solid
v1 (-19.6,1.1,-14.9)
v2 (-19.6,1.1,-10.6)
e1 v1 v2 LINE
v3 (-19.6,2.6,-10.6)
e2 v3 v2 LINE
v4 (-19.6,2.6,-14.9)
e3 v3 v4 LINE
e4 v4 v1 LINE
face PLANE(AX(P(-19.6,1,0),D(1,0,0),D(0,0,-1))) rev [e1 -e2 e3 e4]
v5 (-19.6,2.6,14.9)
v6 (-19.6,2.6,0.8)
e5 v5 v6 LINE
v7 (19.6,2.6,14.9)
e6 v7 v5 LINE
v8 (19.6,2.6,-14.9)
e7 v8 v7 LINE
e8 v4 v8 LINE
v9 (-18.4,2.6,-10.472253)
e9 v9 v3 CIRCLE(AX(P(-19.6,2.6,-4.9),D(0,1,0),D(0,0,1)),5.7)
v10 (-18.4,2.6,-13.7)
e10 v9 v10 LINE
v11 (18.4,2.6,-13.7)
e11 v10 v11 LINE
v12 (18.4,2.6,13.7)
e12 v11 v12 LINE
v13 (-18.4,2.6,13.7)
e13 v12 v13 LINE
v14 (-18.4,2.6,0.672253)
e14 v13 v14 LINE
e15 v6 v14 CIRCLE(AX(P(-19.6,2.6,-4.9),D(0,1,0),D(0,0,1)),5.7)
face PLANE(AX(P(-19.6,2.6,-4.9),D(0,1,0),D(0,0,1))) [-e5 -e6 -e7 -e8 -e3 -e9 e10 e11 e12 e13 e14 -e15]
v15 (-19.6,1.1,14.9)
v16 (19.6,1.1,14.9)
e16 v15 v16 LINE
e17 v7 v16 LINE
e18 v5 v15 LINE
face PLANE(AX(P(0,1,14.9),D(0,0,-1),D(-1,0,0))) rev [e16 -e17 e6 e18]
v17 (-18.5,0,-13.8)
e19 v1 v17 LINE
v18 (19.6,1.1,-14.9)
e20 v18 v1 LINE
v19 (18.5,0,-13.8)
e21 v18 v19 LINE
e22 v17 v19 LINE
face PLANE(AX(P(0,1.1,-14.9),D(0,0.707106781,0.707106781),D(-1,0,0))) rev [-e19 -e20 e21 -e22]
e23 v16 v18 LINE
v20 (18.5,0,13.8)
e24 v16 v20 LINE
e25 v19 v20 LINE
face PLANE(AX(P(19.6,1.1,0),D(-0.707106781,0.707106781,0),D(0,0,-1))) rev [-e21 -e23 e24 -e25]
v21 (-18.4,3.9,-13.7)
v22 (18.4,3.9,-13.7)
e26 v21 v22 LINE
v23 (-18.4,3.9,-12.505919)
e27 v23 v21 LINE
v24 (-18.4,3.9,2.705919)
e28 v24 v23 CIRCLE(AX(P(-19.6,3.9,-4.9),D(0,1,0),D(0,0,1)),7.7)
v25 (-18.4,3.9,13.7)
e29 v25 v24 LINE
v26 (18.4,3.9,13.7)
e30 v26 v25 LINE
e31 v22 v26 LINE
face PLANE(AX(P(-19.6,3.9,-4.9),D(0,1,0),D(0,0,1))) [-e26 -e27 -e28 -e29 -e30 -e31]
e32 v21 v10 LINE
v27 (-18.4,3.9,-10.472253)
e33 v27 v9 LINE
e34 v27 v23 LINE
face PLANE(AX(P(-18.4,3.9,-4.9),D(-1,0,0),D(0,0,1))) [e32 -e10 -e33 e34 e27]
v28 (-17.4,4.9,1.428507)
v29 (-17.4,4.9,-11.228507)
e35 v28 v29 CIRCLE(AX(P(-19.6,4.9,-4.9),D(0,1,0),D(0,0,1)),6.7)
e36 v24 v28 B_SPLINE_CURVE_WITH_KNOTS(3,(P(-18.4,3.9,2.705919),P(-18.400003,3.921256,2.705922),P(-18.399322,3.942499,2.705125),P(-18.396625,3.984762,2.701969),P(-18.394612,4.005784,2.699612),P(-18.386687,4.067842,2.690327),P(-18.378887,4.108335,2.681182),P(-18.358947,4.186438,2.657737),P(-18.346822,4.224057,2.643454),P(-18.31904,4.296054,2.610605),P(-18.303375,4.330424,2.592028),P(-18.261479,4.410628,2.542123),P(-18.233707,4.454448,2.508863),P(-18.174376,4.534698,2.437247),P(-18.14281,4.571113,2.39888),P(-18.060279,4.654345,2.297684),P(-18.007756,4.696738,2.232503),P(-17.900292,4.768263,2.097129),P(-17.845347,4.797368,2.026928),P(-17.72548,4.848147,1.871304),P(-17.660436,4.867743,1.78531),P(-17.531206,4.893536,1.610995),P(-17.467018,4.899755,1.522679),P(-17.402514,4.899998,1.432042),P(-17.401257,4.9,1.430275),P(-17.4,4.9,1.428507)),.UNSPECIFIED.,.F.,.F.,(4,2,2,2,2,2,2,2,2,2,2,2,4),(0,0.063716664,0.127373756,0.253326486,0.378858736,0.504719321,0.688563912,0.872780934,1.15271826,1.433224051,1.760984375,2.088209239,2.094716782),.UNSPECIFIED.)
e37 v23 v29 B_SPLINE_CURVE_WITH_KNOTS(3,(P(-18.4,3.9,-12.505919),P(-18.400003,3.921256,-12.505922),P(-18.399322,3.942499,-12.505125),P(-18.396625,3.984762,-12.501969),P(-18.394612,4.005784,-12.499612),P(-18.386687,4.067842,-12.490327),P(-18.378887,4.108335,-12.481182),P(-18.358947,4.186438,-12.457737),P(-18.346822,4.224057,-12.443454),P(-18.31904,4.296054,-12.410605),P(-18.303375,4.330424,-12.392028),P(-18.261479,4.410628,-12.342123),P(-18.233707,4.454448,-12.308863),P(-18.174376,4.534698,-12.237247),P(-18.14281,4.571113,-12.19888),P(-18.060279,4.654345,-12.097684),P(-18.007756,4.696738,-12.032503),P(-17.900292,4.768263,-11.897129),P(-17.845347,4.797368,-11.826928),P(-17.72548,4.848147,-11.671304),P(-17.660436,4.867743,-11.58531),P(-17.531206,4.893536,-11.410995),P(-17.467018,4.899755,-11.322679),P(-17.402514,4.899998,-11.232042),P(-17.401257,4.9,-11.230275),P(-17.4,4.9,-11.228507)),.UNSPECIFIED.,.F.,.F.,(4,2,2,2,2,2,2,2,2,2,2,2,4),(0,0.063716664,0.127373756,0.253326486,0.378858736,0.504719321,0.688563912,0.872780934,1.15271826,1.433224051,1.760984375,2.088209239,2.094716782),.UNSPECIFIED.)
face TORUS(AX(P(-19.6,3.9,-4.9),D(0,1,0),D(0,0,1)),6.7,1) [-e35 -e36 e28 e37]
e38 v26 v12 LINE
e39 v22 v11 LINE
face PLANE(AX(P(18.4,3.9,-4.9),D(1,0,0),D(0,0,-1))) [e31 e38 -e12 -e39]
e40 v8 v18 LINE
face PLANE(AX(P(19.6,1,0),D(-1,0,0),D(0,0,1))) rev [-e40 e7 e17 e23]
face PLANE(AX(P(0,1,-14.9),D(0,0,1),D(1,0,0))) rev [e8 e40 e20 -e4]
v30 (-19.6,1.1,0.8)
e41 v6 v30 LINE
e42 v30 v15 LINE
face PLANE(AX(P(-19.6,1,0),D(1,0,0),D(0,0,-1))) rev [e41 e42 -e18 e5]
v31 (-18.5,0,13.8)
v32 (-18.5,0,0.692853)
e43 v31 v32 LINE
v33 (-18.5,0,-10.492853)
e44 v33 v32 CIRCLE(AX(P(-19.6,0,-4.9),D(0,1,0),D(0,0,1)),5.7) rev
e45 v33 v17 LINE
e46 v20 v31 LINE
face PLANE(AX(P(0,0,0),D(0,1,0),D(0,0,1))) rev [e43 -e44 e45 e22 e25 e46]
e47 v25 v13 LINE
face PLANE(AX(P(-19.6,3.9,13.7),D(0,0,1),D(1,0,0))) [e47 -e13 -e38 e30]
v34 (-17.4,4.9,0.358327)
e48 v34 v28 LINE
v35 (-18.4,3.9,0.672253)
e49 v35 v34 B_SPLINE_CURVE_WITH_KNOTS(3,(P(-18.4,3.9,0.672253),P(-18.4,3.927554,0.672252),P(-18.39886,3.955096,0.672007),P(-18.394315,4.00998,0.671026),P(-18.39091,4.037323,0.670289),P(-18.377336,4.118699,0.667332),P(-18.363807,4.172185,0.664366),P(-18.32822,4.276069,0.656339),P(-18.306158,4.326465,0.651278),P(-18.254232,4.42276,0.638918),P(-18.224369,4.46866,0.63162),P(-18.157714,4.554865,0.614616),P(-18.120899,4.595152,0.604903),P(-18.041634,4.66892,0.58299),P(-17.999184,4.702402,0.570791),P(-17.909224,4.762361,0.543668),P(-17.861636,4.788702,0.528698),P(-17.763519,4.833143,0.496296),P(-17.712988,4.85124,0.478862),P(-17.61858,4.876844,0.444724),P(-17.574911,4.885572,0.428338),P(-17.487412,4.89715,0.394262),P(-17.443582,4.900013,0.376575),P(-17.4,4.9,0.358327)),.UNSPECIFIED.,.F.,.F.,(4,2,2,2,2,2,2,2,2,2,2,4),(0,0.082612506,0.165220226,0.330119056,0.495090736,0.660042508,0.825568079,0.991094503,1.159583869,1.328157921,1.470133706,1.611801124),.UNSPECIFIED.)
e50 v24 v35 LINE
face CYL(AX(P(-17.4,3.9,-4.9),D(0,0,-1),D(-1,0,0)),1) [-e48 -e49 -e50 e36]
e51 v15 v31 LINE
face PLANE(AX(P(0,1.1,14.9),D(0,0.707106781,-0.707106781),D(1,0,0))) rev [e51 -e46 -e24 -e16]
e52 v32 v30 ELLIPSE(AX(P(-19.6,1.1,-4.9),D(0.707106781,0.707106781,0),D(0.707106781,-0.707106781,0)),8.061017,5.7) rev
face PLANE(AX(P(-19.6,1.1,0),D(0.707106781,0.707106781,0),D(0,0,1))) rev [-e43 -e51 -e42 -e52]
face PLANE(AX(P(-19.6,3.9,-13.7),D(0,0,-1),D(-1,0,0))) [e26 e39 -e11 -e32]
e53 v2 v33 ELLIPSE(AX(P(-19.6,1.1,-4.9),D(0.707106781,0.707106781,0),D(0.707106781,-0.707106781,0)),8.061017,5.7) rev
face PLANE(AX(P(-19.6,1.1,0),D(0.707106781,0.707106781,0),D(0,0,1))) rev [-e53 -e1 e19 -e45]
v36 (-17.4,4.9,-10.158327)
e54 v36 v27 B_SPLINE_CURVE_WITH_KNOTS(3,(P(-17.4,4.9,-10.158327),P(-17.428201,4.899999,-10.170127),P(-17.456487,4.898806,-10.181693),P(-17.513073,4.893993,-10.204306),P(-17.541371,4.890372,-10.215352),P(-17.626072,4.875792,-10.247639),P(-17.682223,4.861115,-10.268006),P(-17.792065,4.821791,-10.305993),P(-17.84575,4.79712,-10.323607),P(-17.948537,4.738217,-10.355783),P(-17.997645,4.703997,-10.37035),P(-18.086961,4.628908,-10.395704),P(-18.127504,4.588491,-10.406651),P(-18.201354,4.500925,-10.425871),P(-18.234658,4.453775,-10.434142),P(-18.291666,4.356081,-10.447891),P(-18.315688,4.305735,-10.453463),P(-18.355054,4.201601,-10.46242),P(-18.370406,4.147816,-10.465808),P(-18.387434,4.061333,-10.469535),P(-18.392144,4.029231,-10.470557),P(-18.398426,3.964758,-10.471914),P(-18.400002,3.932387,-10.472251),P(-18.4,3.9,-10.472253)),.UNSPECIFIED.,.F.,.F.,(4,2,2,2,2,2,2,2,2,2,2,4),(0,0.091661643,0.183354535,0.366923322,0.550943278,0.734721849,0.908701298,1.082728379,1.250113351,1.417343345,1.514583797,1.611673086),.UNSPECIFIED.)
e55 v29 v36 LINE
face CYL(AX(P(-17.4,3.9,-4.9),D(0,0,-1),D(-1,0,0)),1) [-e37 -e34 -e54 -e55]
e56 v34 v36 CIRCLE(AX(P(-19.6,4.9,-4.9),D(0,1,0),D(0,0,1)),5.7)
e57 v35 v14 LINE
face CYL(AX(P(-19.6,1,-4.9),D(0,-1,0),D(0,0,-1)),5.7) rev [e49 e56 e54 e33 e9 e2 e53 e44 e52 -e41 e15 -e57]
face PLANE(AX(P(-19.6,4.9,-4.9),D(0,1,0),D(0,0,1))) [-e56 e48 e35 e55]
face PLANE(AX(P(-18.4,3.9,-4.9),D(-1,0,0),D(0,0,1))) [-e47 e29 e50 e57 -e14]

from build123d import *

# Parameters (mm, degrees)
BOSS_EXTRUDE1_DEPTH = 1
BOSS_EXTRUDE2_START = 1
BOSS_EXTRUDE2_DEPTH = 1.6
BOSS_EXTRUDE3_START = 2.6
BOSS_EXTRUDE3_DEPTH = 1.3
BOSS_EXTRUDE4_START = 3.9
BOSS_EXTRUDE4_DEPTH = 1
FILLET1_R           = 1
CHAMFER1_SIZE       = 1.1


with BuildPart() as part:
    # Sketch1 → Boss-Extrude1 (new body)
    with BuildSketch(Plane(origin=(0, 0, 0), x_dir=(1, 0, 0), z_dir=(0, 1, 0))):
        with BuildLine():
            Line((-18.4, 13.7), (-18.4, 12.505918748))
            ThreePointArc((-18.4, 12.505918748), (-11.9, 4.9), (-18.4, -2.705918748))
            Line((-18.4, -2.705918748), (-18.4, -13.7))
            Line((-18.4, -13.7), (18.4, -13.7))
            Line((18.4, -13.7), (18.4, 13.7))
            Line((18.4, 13.7), (-18.4, 13.7))
        make_face()
        with BuildLine():
            ThreePointArc((-18.4, -2.705918748), (-11.9, 4.9), (-18.4, 12.505918748))
            Line((-18.4, 12.505918748), (-18.4, 10.472252686))
            ThreePointArc((-18.4, 10.472252686), (-13.9, 4.9), (-18.4, -0.672252686))
            Line((-18.4, -0.672252686), (-18.4, -2.705918748))
        make_face()
        with BuildLine():
            Line((19.6, 14.9), (-19.6, 14.9))
            Line((-19.6, 14.9), (-19.6, 12.6))
            ThreePointArc((-19.6, 12.6), (-18.998158808, 12.576443654), (-18.4, 12.505918748))
            Line((-18.4, 12.505918748), (-18.4, 13.7))
            Line((-18.4, 13.7), (18.4, 13.7))
            Line((18.4, 13.7), (18.4, -13.7))
            Line((18.4, -13.7), (-18.4, -13.7))
            Line((-18.4, -13.7), (-18.4, -2.705918748))
            ThreePointArc((-18.4, -2.705918748), (-18.998158808, -2.776443654), (-19.6, -2.8))
            Line((-19.6, -2.8), (-19.6, -14.9))
            Line((-19.6, -14.9), (19.6, -14.9))
            Line((19.6, -14.9), (19.6, 14.9))
        make_face()
        with BuildLine():
            ThreePointArc((-18.4, 12.505918748), (-18.998158808, 12.576443654), (-19.6, 12.6))
            Line((-19.6, 12.6), (-19.6, 10.6))
            ThreePointArc((-19.6, 10.6), (-18.996609708, 10.567973196), (-18.4, 10.472252686))
            Line((-18.4, 10.472252686), (-18.4, 12.505918748))
        make_face()
        with BuildLine():
            ThreePointArc((-18.4, -0.672252686), (-18.996609708, -0.767973196), (-19.6, -0.8))
            Line((-19.6, -0.8), (-19.6, -2.8))
            ThreePointArc((-19.6, -2.8), (-18.998158808, -2.776443654), (-18.4, -2.705918748))
            Line((-18.4, -2.705918748), (-18.4, -0.672252686))
        make_face()
    extrude(amount=BOSS_EXTRUDE1_DEPTH)

    # Sketch1<5> → Boss-Extrude2 (add)
    with BuildSketch(Plane(origin=(0, 0, 0), x_dir=(1, 0, 0), z_dir=(0, 1, 0)).offset(BOSS_EXTRUDE2_START)):
        with BuildLine():
            Line((-18.4, 13.7), (-18.4, 12.505918748))
            ThreePointArc((-18.4, 12.505918748), (-11.9, 4.9), (-18.4, -2.705918748))
            Line((-18.4, -2.705918748), (-18.4, -13.7))
            Line((-18.4, -13.7), (18.4, -13.7))
            Line((18.4, -13.7), (18.4, 13.7))
            Line((18.4, 13.7), (-18.4, 13.7))
        make_face()
        with BuildLine():
            ThreePointArc((-18.4, -2.705918748), (-11.9, 4.9), (-18.4, 12.505918748))
            Line((-18.4, 12.505918748), (-18.4, 10.472252686))
            ThreePointArc((-18.4, 10.472252686), (-13.9, 4.9), (-18.4, -0.672252686))
            Line((-18.4, -0.672252686), (-18.4, -2.705918748))
        make_face()
        with BuildLine():
            ThreePointArc((-18.4, 12.505918748), (-18.998158808, 12.576443654), (-19.6, 12.6))
            Line((-19.6, 12.6), (-19.6, 10.6))
            ThreePointArc((-19.6, 10.6), (-18.996609708, 10.567973196), (-18.4, 10.472252686))
            Line((-18.4, 10.472252686), (-18.4, 12.505918748))
        make_face()
        with BuildLine():
            ThreePointArc((-18.4, -0.672252686), (-18.996609708, -0.767973196), (-19.6, -0.8))
            Line((-19.6, -0.8), (-19.6, -2.8))
            ThreePointArc((-19.6, -2.8), (-18.998158808, -2.776443654), (-18.4, -2.705918748))
            Line((-18.4, -2.705918748), (-18.4, -0.672252686))
        make_face()
        with BuildLine():
            Line((19.6, 14.9), (-19.6, 14.9))
            Line((-19.6, 14.9), (-19.6, 12.6))
            ThreePointArc((-19.6, 12.6), (-18.998158808, 12.576443654), (-18.4, 12.505918748))
            Line((-18.4, 12.505918748), (-18.4, 13.7))
            Line((-18.4, 13.7), (18.4, 13.7))
            Line((18.4, 13.7), (18.4, -13.7))
            Line((18.4, -13.7), (-18.4, -13.7))
            Line((-18.4, -13.7), (-18.4, -2.705918748))
            ThreePointArc((-18.4, -2.705918748), (-18.998158808, -2.776443654), (-19.6, -2.8))
            Line((-19.6, -2.8), (-19.6, -14.9))
            Line((-19.6, -14.9), (19.6, -14.9))
            Line((19.6, -14.9), (19.6, 14.9))
        make_face()
    extrude(amount=BOSS_EXTRUDE2_DEPTH)

    # Sketch1<6> → Boss-Extrude3 (add)
    with BuildSketch(Plane(origin=(0, 0, 0), x_dir=(1, 0, 0), z_dir=(0, 1, 0)).offset(BOSS_EXTRUDE3_START)):
        with BuildLine():
            Line((-18.4, 13.7), (-18.4, 12.505918748))
            ThreePointArc((-18.4, 12.505918748), (-11.9, 4.9), (-18.4, -2.705918748))
            Line((-18.4, -2.705918748), (-18.4, -13.7))
            Line((-18.4, -13.7), (18.4, -13.7))
            Line((18.4, -13.7), (18.4, 13.7))
            Line((18.4, 13.7), (-18.4, 13.7))
        make_face()
        with BuildLine():
            ThreePointArc((-18.4, -2.705918748), (-11.9, 4.9), (-18.4, 12.505918748))
            Line((-18.4, 12.505918748), (-18.4, 10.472252686))
            ThreePointArc((-18.4, 10.472252686), (-13.9, 4.9), (-18.4, -0.672252686))
            Line((-18.4, -0.672252686), (-18.4, -2.705918748))
        make_face()
    extrude(amount=BOSS_EXTRUDE3_DEPTH)

    # Sketch1<8> → Boss-Extrude4 (add)
    with BuildSketch(Plane(origin=(0, 0, 0), x_dir=(1, 0, 0), z_dir=(0, 1, 0)).offset(BOSS_EXTRUDE4_START)):
        with BuildLine():
            ThreePointArc((-18.4, -2.705918748), (-11.9, 4.9), (-18.4, 12.505918748))
            Line((-18.4, 12.505918748), (-18.4, 10.472252686))
            ThreePointArc((-18.4, 10.472252686), (-13.9, 4.9), (-18.4, -0.672252686))
            Line((-18.4, -0.672252686), (-18.4, -2.705918748))
        make_face()
    extrude(amount=BOSS_EXTRUDE4_DEPTH)

    # Fillet1
    fillet1_edges = [part.edges().sort_by_distance(p)[0] for p in [
        (-11.9, 4.9, -4.9),
        (-18.4, 4.9, 1.689085717),
        (-18.4, 4.9, -11.489085717),
    ]]
    fillet(fillet1_edges, radius=FILLET1_R - 0.0001)  # a hair under: the kernel refuses the full size

    # Chamfer1
    chamfer1_edges = [part.edges().sort_by_distance(p)[0] for p in [
        (0, 0, 14.9),
        (-19.6, 0, 7.85),
        (-19.6, 0, -12.75),
        (0, 0, -14.9),
        (19.6, 0, 0),
    ]]
    chamfer(chamfer1_edges, length=CHAMFER1_SIZE)


solid = part.part
